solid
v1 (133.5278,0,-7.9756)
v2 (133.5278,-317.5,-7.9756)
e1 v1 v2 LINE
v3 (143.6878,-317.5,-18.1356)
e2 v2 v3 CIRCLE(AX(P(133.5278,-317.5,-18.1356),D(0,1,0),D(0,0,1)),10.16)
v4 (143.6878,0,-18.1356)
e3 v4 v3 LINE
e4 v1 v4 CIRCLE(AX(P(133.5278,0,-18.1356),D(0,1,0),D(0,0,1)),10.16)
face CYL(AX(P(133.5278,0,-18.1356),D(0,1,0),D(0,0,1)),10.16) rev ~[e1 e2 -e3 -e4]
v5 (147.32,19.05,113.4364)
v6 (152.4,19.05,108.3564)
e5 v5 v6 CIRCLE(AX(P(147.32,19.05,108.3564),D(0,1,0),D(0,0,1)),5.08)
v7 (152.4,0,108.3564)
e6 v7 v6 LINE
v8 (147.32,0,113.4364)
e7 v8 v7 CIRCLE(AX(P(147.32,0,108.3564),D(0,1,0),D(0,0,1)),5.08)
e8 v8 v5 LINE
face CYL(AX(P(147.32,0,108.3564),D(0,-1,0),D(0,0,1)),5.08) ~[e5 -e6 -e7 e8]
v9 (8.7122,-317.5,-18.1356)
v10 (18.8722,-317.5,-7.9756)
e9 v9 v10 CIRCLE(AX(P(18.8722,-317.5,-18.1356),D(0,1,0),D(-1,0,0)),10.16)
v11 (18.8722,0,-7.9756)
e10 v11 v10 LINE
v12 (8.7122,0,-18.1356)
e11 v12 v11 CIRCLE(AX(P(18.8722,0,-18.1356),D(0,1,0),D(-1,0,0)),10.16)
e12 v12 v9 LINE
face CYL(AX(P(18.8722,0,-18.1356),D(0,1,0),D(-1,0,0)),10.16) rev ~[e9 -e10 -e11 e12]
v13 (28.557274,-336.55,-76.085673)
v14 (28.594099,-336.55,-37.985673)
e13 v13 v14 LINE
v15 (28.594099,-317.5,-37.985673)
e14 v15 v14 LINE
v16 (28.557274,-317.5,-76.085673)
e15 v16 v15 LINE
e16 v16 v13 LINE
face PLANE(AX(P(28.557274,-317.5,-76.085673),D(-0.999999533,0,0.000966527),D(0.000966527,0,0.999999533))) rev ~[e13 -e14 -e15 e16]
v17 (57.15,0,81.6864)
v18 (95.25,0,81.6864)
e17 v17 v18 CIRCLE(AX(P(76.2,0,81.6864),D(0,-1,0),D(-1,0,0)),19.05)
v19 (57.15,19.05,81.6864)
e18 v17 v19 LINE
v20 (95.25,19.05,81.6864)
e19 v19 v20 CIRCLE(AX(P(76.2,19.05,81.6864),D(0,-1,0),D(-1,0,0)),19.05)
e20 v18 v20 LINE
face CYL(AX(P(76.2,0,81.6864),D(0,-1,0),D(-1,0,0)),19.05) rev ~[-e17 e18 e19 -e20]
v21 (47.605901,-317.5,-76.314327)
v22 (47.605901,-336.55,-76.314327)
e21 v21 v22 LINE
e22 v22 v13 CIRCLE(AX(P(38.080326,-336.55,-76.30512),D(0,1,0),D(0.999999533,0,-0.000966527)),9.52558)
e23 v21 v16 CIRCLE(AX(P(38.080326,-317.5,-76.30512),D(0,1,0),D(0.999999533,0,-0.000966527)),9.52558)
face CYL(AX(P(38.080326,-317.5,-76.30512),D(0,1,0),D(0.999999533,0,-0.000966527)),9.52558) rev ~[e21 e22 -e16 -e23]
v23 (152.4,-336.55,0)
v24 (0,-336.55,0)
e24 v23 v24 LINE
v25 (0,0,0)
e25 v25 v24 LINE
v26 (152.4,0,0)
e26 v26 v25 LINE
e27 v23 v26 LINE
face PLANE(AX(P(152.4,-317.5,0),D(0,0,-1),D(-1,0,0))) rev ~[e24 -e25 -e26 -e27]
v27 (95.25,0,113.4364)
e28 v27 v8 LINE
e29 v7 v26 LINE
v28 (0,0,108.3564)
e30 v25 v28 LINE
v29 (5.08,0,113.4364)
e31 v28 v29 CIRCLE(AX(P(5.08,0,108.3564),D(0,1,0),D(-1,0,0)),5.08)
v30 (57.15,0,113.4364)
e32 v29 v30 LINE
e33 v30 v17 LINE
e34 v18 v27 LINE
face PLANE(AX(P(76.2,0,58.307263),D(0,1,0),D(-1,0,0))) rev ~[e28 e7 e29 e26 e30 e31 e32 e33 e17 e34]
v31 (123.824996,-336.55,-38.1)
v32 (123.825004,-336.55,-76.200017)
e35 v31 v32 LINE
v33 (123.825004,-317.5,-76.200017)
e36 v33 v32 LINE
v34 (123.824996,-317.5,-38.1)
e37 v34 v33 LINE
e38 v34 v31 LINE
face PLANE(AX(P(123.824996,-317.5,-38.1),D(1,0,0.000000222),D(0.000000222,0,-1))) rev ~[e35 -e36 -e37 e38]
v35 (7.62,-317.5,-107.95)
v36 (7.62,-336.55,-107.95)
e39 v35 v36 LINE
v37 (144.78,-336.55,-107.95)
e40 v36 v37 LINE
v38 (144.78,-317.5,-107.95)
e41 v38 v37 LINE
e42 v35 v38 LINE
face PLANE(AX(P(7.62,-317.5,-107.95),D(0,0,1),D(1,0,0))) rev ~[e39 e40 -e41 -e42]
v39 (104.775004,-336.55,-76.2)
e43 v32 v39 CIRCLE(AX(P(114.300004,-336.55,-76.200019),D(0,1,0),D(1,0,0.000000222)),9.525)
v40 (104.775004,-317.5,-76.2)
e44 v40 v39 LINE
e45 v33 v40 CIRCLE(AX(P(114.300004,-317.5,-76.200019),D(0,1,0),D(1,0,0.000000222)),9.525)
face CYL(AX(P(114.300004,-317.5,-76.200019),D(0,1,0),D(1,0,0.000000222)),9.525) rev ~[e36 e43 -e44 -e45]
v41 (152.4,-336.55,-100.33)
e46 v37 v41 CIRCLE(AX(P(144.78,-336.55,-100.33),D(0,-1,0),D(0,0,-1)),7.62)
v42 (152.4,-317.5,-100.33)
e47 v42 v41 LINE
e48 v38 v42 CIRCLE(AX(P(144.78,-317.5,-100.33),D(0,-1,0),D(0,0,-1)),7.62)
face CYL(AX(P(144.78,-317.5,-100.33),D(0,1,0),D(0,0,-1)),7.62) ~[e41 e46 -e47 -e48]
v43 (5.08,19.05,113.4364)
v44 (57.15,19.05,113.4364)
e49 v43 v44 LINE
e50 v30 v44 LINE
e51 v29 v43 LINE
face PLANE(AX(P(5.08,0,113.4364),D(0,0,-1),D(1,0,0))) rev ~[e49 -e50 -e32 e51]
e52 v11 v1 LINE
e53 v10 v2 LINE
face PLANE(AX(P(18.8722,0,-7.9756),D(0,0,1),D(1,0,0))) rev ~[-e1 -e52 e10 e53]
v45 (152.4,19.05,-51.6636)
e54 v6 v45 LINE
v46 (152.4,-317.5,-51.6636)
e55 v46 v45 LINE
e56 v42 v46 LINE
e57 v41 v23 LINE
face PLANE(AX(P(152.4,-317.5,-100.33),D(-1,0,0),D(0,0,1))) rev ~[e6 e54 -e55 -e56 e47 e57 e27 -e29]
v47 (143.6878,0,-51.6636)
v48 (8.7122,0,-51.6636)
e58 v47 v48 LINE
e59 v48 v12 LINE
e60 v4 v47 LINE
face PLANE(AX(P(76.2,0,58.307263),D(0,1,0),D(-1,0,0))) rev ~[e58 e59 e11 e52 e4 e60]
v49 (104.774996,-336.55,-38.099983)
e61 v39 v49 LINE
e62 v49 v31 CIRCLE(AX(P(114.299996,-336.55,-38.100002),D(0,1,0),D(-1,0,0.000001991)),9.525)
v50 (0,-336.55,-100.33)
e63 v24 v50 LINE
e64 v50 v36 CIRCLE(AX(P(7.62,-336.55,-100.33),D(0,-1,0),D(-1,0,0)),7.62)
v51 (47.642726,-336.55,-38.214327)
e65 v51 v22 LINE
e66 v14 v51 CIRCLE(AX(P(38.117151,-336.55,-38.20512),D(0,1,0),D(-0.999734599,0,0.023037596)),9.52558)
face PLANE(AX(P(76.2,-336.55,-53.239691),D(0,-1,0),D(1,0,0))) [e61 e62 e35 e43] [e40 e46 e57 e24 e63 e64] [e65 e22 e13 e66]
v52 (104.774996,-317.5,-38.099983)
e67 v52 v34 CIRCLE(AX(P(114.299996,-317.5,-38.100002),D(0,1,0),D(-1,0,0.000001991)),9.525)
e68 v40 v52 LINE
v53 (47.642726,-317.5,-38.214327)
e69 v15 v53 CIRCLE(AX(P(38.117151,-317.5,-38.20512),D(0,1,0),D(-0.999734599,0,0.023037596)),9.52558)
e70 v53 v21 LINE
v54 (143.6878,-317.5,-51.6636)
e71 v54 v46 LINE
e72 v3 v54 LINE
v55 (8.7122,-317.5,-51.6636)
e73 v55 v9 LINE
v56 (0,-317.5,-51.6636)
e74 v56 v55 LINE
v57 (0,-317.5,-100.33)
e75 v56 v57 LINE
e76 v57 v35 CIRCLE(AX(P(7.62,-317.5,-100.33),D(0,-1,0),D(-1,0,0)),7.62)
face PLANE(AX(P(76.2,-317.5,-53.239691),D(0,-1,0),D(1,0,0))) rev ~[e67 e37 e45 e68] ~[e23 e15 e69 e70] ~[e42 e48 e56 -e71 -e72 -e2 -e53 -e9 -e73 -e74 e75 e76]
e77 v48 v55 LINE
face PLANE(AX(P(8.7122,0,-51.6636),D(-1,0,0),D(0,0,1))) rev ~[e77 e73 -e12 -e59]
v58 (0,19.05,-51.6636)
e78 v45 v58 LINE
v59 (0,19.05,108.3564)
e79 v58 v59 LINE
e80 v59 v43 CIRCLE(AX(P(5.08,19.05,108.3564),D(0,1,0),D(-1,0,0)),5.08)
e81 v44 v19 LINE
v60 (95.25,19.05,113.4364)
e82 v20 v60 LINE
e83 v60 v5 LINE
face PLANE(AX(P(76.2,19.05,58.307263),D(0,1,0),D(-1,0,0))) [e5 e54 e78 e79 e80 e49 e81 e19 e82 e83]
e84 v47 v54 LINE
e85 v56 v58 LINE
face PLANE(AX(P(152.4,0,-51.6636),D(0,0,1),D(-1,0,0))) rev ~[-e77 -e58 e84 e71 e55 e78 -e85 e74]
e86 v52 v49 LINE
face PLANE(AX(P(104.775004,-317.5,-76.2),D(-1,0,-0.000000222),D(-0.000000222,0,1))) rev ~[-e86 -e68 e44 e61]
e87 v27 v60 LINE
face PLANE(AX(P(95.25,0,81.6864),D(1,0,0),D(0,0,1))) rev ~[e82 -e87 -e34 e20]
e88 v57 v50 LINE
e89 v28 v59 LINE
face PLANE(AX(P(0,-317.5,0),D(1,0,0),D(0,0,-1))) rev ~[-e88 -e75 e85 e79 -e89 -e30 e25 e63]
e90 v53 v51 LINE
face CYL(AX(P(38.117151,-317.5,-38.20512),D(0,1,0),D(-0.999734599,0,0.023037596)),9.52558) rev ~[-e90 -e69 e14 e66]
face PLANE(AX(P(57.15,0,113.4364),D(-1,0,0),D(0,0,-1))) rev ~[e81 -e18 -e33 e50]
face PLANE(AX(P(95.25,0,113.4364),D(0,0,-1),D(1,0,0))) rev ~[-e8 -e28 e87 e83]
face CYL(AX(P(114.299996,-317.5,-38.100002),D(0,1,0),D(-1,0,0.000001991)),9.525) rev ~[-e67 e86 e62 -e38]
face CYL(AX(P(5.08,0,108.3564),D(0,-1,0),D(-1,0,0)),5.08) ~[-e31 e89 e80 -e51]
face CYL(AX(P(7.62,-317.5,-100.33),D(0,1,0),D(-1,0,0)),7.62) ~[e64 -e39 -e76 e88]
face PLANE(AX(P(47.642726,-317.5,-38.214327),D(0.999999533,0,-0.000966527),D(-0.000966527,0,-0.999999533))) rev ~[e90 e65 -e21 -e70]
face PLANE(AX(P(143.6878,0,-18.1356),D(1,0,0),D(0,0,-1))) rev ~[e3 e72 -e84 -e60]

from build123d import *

# Parameters (mm, degrees)
F1_DEPTH = 317.5
F4_DEPTH = 19.05
F5_DEPTH = 19.05


# Not quite as in the source:
# - a feature names something its author has since deleted; it is built from what else it names


with BuildPart() as f1:
    # F0 (on Front) → F1 (new body)
    with BuildSketch(Plane.XZ):
        with BuildLine():
            Line((152.4, 0), (0, 0))
            Line((0, 0), (0, -51.6636))
            Line((0, -51.6636), (8.7122, -51.6636))
            Line((8.7122, -51.6636), (8.7122, -18.1356))
            ThreePointArc((8.7122, -18.1356), (11.6879951031, -10.9513951031), (18.8722, -7.9756))
            Line((18.8722, -7.9756), (133.5278, -7.9756))
            ThreePointArc((133.5278, -7.9756), (140.7120048969, -10.9513951031), (143.6878, -18.1356))
            Line((143.6878, -18.1356), (143.6878, -51.6636))
            Line((143.6878, -51.6636), (152.4, -51.6636))
            Line((152.4, -51.6636), (152.4, 0))
        make_face()
    extrude(amount=F1_DEPTH)

    # F3 (on face) → F4 (join)
    with BuildSketch(Plane(origin=(0, 0, 0), x_dir=(-1, 0, 0), z_dir=(0, 1, 0))):
        with BuildLine():
            Line((-152.4, 108.3564), (-152.4, 0))
            Line((-152.4, 0), (0, 0))
            Line((0, 0), (0, 108.3564))
            ThreePointArc((0, 108.3564), (-1.4878975516, 111.9485024484), (-5.08, 113.4364))
            Line((-5.08, 113.4364), (-57.15, 113.4364))
            Line((-57.15, 113.4364), (-57.15, 81.6864))
            ThreePointArc((-57.15, 81.6864), (-76.2, 62.6364), (-95.25, 81.6864))
            Line((-95.25, 81.6864), (-95.25, 113.4364))
            Line((-95.25, 113.4364), (-147.32, 113.4364))
            ThreePointArc((-147.32, 113.4364), (-150.9121024484, 111.9485024484), (-152.4, 108.3564))
        make_face()
        with BuildLine():
            Line((-143.6878, -18.1356), (-143.6878, -51.6636))
            Line((-143.6878, -51.6636), (-8.7122, -51.6636))
            Line((-8.7122, -51.6636), (-8.7122, -18.1356))
            ThreePointArc((-8.7122, -18.1356), (-11.6879951031, -10.9513951031), (-18.8722, -7.9756))
            Line((-18.8722, -7.9756), (-133.5278, -7.9756))
            ThreePointArc((-133.5278, -7.9756), (-140.7120048969, -10.9513951031), (-143.6878, -18.1356))
        make_face()
        with BuildLine():
            Line((-152.4, 0), (-152.4, -51.6636))
            Line((-152.4, -51.6636), (-143.6878, -51.6636))
            Line((-143.6878, -51.6636), (-143.6878, -18.1356))
            ThreePointArc((-143.6878, -18.1356), (-140.7120048969, -10.9513951031), (-133.5278, -7.9756))
            Line((-133.5278, -7.9756), (-18.8722, -7.9756))
            ThreePointArc((-18.8722, -7.9756), (-11.6879951031, -10.9513951031), (-8.7122, -18.1356))
            Line((-8.7122, -18.1356), (-8.7122, -51.6636))
            Line((-8.7122, -51.6636), (0, -51.6636))
            Line((0, -51.6636), (0, 0))
            Line((0, 0), (-152.4, 0))
        make_face()
    extrude(amount=F4_DEPTH)

    # F2 (on face) → F5 (join)
    with BuildSketch(Plane.XZ.offset(317.5)):
        with BuildLine():
            Line((152.4, 0), (0, 0))
            Line((0, 0), (0, -100.33))
            ThreePointArc((0, -100.33), (2.2318463274, -105.7181536726), (7.62, -107.95))
            Line((7.62, -107.95), (144.78, -107.95))
            ThreePointArc((144.78, -107.95), (150.1681536726, -105.7181536726), (152.4, -100.33))
            Line((152.4, -100.33), (152.4, 0))
        make_face()
        with BuildLine():
            Line((28.5572737867, -76.085673397), (28.5940985013, -37.985673397))
            ThreePointArc((28.5940985013, -37.985673397), (38.2314841006, -28.6802259255), (47.6427262133, -38.214326603))
            Line((47.6427262133, -38.214326603), (47.6059014987, -76.314326603))
            ThreePointArc((47.6059014987, -76.314326603), (37.9659922536, -85.8300138104), (28.5572737867, -76.085673397))
        make_face(mode=Mode.SUBTRACT)
        with BuildLine():
            Line((104.7750042372, -76.2000004751), (104.7749957628, -38.099982679))
            ThreePointArc((104.7749957628, -38.099982679), (114.3000041857, -28.5750016435), (123.8249957628, -38.0999995249))
            Line((123.8249957628, -38.0999995249), (123.8250042372, -76.200017321))
            ThreePointArc((123.8250042372, -76.200017321), (114.2999958142, -85.7250194396), (104.7750042372, -76.2000004751))
        make_face(mode=Mode.SUBTRACT)
    extrude(amount=F5_DEPTH)


solid = f1.part
